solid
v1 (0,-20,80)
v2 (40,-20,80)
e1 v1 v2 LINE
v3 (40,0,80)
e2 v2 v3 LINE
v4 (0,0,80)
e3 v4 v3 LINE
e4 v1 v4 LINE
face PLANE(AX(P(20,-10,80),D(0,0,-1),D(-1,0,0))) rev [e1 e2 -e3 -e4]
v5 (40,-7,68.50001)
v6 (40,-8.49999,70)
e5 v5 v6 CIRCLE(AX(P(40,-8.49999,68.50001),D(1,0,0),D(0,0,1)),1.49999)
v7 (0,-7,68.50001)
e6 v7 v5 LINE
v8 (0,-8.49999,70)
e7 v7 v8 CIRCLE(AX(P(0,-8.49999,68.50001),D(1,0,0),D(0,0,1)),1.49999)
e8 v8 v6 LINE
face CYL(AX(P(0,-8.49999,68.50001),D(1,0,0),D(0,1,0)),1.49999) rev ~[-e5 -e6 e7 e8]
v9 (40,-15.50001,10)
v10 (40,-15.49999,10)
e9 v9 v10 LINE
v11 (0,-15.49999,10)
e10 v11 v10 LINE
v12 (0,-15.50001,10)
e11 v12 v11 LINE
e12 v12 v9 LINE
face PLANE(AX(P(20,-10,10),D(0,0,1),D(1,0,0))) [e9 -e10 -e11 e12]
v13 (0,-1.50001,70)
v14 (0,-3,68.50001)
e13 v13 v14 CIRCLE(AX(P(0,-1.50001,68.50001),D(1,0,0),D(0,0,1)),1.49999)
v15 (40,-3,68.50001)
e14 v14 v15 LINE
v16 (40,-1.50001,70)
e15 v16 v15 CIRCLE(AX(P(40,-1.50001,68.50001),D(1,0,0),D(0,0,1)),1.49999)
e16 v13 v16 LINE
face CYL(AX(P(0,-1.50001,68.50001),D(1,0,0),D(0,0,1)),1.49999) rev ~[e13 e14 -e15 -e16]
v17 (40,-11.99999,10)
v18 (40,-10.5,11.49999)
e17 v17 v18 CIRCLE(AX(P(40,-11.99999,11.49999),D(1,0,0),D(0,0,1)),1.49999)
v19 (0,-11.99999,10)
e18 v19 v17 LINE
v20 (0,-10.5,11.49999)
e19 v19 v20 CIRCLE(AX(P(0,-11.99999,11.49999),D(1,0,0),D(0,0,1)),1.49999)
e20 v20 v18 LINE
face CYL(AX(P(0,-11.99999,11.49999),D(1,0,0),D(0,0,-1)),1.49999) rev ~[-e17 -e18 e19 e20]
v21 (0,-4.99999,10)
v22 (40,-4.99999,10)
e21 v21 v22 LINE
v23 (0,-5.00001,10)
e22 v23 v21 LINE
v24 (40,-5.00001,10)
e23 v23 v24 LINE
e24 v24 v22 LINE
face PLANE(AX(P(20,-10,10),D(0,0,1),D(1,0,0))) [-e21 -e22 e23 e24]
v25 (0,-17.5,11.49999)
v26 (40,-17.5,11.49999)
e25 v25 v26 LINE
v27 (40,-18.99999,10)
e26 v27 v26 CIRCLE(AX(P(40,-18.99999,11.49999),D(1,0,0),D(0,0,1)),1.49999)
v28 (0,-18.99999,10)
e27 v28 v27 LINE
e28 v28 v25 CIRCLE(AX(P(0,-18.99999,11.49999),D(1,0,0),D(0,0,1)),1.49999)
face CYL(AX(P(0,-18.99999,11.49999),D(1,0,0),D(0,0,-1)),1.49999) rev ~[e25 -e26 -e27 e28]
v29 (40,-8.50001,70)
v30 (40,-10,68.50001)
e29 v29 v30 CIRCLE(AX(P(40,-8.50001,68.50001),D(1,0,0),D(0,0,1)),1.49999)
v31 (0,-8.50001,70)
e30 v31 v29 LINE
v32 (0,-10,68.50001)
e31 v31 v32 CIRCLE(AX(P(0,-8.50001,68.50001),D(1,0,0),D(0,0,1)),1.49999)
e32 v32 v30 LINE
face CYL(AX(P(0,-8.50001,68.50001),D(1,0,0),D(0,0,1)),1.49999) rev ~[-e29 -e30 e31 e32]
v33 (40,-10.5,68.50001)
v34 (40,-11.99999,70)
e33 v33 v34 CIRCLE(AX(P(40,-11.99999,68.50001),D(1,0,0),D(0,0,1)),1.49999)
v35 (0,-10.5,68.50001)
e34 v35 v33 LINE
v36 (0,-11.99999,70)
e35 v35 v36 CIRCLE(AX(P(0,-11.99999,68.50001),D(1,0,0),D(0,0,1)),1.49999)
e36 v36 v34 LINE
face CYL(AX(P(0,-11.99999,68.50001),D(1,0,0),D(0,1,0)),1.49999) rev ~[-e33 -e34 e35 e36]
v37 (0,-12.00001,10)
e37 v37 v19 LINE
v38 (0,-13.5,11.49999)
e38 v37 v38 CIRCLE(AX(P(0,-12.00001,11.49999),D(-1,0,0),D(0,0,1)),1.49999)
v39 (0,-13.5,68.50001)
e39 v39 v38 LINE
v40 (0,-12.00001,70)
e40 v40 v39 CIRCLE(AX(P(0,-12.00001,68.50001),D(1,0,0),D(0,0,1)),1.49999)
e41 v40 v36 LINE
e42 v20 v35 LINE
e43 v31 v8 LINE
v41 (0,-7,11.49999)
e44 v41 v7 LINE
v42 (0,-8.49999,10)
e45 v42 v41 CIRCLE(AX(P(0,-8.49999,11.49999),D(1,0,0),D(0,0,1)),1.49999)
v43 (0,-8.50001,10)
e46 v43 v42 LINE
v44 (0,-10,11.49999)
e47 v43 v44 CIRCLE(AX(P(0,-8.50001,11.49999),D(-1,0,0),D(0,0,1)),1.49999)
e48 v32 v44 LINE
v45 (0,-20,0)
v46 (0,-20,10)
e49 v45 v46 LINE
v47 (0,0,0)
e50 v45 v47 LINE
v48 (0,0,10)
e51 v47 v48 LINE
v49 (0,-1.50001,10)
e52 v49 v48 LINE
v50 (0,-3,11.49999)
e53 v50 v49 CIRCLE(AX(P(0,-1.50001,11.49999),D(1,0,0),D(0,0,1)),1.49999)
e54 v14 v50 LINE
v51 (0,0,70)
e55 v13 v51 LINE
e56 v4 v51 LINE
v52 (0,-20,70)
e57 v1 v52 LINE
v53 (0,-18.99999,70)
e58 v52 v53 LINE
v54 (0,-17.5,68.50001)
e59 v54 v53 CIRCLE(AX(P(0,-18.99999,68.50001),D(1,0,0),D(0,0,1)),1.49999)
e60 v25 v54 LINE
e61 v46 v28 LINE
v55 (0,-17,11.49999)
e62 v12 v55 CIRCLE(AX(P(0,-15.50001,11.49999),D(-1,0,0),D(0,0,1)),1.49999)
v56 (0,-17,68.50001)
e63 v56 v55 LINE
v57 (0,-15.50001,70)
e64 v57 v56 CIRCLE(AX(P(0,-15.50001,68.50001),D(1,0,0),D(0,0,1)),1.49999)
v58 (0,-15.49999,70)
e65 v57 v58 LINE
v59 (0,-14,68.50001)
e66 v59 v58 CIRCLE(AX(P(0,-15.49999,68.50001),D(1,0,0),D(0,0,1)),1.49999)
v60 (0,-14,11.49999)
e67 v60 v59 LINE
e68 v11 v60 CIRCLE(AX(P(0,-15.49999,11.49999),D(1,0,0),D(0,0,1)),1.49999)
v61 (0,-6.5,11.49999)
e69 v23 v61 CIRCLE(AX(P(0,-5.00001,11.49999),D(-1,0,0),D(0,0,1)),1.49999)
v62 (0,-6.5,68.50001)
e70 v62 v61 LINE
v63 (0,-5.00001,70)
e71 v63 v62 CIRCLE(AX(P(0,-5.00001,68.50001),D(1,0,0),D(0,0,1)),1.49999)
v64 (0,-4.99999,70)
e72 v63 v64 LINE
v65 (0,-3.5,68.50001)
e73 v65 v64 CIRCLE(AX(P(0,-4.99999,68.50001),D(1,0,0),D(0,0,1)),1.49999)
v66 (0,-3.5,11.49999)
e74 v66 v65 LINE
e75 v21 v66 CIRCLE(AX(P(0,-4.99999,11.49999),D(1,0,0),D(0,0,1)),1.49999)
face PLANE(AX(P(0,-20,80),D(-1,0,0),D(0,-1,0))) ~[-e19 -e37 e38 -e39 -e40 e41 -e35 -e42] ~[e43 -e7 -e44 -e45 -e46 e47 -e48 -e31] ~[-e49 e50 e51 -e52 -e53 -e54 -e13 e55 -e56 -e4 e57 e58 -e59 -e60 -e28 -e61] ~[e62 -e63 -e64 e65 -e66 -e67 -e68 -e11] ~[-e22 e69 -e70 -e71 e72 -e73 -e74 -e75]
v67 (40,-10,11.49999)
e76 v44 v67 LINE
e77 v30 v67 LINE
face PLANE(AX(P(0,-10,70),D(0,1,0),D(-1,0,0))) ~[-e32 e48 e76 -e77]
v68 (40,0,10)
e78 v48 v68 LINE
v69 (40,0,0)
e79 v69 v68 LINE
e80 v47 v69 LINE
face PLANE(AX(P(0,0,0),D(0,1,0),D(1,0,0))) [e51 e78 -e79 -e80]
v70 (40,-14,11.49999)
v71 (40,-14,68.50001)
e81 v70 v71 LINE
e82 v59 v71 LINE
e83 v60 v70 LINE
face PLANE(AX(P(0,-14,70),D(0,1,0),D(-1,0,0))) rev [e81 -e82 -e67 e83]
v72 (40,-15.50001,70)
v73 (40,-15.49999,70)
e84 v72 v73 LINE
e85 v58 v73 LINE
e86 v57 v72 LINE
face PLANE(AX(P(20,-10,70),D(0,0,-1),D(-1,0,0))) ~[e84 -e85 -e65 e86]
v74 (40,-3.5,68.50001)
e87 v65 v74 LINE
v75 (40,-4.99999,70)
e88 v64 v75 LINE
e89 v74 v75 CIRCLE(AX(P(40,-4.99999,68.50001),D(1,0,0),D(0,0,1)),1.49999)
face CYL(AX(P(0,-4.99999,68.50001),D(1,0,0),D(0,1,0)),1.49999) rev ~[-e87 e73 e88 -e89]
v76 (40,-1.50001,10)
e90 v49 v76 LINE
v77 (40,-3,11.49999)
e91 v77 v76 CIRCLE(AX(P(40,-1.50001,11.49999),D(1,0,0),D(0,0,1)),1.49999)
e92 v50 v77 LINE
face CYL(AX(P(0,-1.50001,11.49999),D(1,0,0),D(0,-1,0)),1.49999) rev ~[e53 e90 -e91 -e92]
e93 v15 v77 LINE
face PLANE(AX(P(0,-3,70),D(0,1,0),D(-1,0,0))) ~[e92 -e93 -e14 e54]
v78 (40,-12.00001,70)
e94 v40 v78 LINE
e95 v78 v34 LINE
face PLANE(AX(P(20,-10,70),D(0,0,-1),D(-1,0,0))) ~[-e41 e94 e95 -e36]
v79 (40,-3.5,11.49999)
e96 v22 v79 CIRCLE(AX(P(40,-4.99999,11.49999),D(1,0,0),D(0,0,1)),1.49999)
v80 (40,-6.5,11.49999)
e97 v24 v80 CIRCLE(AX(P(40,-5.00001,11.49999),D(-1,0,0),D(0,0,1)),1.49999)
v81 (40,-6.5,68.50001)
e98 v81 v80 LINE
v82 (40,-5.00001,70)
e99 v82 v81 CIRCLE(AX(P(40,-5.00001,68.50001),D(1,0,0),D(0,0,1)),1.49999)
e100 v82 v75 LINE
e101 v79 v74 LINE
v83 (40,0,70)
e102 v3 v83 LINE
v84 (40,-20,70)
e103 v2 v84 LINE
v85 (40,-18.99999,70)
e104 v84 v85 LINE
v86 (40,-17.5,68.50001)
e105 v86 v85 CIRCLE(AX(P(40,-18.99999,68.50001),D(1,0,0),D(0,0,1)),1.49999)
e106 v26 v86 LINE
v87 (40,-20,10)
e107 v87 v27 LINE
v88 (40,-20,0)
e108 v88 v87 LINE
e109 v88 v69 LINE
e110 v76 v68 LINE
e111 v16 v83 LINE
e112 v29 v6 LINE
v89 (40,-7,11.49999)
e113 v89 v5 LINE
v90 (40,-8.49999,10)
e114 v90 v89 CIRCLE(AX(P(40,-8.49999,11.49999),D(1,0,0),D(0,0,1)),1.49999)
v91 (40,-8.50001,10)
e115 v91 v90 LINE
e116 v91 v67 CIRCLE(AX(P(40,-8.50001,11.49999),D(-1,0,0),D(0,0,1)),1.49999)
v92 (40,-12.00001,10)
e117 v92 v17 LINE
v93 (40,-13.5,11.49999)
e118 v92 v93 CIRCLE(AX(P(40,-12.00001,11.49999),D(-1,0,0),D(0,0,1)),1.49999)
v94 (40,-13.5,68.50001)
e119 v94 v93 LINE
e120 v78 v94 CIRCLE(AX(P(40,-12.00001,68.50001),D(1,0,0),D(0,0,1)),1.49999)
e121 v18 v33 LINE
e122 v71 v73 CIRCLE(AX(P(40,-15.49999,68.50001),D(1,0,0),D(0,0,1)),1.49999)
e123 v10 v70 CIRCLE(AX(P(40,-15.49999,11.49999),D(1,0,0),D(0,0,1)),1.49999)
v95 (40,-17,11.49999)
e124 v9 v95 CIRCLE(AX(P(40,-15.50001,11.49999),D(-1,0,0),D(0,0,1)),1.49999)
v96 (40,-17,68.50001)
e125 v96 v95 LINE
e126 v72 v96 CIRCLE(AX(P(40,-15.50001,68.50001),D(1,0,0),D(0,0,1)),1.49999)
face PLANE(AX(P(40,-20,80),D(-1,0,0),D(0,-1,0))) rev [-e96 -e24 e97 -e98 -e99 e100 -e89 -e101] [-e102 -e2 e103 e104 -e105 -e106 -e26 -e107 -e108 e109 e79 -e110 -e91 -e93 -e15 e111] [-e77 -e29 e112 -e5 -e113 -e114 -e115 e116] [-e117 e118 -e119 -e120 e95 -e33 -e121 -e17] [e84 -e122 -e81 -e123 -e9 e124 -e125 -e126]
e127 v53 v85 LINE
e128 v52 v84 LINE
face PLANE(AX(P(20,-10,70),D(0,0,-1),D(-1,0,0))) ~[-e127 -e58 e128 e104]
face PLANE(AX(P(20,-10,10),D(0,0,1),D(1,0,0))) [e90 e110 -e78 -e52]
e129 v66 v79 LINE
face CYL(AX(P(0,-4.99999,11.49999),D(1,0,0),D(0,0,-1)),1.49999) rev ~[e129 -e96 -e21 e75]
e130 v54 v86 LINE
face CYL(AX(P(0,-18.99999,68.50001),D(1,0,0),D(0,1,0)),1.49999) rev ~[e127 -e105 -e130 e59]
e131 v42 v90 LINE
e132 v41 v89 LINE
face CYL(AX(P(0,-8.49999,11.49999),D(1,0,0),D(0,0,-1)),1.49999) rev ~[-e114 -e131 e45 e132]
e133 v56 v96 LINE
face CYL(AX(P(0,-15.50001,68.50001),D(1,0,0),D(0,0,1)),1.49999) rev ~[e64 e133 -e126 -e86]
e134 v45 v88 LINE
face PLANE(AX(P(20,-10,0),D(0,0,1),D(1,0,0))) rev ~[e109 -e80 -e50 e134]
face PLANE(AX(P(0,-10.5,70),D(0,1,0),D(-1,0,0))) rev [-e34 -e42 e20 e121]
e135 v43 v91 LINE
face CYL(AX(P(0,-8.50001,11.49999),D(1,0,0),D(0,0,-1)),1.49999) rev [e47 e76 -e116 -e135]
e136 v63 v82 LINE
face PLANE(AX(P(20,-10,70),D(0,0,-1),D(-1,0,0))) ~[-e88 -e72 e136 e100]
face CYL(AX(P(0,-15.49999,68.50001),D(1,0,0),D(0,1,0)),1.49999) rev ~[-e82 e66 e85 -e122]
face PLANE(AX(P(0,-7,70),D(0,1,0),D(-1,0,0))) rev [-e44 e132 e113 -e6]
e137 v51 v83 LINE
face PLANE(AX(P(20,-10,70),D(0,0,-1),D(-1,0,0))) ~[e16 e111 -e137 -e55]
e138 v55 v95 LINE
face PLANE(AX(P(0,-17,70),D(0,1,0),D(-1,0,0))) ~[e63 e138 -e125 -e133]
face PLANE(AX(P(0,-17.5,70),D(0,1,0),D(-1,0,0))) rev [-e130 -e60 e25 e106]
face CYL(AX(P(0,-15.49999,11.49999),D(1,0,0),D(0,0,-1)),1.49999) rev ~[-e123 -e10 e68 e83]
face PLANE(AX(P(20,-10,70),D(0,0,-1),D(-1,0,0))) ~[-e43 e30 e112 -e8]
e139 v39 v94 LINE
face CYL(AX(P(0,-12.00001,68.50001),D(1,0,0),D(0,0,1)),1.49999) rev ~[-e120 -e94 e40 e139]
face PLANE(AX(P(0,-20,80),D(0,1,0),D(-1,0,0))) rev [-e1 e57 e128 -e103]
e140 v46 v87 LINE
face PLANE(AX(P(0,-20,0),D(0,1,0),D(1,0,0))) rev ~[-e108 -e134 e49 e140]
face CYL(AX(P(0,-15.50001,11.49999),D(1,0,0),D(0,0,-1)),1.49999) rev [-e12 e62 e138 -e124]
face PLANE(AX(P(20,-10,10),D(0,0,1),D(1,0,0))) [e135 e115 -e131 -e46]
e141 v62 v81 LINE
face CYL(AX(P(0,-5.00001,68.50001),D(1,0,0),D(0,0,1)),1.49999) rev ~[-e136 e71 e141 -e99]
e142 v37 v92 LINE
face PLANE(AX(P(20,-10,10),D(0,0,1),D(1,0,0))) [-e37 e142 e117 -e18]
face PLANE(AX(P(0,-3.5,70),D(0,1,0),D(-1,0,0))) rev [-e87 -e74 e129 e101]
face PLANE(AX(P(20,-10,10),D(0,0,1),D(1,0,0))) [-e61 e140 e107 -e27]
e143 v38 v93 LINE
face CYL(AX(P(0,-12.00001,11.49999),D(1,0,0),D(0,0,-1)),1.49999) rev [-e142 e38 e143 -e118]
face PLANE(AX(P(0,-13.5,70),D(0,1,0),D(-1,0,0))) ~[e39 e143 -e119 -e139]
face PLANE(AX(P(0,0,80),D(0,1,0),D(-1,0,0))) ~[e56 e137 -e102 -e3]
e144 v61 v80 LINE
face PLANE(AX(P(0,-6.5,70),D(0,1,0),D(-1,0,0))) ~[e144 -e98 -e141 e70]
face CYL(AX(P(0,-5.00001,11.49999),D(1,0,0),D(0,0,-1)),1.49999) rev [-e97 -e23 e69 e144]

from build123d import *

# Parameters (mm, degrees)
F0_W     = 40
F0_H     = 20
F1_DEPTH = 10
F3_W     = 40
F3_H     = 0.5
F4_DEPTH = 30
F6_R     = 1.49999


# Not quite as in the source:
# - a fillet or chamfer is up to 0.001 mm smaller than in the source, because OpenCascade refuses the exact size


with BuildPart() as f1:
    # F0 (on Top) → F1 (new body)
    with BuildSketch(Plane.XY):
        with Locations((20, -10)):
            Rectangle(F0_W, F0_H)
    extrude(amount=F1_DEPTH)

    # F3 (on face) → F4 (join)
    with BuildSketch(Plane.XY.offset(10)):
        with Locations((20, -3.25)):
            Rectangle(F3_W, F3_H)
        with Locations((20, -6.75)):
            Rectangle(F3_W, F3_H)
        with Locations((20, -10.25)):
            Rectangle(F3_W, F3_H)
        with Locations((20, -13.75)):
            Rectangle(F3_W, F3_H)
        with Locations((20, -17.25)):
            Rectangle(F3_W, F3_H)
    extrude(amount=F4_DEPTH)

    # F5: F1 across face


with BuildPart() as f1_1:
    add(f1.part)
    add(f1.part.mirror(Plane(origin=(20, -17.25, 40), x_dir=(1, 0, 0), z_dir=(0, 0, 1))))

    # F6 (radius 1.5 in the source; OpenCascade refuses exactly that, so slightly less here)
    f6_edges = [f1_1.edges().sort_by_distance(p)[0] for p in [
        (20, -17, 70),
        (20, -13.5, 70),
        (20, -10, 70),
        (20, -6.5, 70),
        (20, -3, 70),
        (20, -3.5, 70),
        (20, -7, 70),
        (20, -10.5, 70),
        (20, -14, 70),
        (20, -17.5, 70),
        (20, -17.5, 10),
        (20, -14, 10),
        (20, -10.5, 10),
        (20, -7, 10),
        (20, -3.5, 10),
        (20, -17, 10),
        (20, -13.5, 10),
        (20, -10, 10),
        (20, -6.5, 10),
        (20, -3, 10),
    ]]
    fillet(f6_edges, radius=F6_R)


solid = f1_1.part
